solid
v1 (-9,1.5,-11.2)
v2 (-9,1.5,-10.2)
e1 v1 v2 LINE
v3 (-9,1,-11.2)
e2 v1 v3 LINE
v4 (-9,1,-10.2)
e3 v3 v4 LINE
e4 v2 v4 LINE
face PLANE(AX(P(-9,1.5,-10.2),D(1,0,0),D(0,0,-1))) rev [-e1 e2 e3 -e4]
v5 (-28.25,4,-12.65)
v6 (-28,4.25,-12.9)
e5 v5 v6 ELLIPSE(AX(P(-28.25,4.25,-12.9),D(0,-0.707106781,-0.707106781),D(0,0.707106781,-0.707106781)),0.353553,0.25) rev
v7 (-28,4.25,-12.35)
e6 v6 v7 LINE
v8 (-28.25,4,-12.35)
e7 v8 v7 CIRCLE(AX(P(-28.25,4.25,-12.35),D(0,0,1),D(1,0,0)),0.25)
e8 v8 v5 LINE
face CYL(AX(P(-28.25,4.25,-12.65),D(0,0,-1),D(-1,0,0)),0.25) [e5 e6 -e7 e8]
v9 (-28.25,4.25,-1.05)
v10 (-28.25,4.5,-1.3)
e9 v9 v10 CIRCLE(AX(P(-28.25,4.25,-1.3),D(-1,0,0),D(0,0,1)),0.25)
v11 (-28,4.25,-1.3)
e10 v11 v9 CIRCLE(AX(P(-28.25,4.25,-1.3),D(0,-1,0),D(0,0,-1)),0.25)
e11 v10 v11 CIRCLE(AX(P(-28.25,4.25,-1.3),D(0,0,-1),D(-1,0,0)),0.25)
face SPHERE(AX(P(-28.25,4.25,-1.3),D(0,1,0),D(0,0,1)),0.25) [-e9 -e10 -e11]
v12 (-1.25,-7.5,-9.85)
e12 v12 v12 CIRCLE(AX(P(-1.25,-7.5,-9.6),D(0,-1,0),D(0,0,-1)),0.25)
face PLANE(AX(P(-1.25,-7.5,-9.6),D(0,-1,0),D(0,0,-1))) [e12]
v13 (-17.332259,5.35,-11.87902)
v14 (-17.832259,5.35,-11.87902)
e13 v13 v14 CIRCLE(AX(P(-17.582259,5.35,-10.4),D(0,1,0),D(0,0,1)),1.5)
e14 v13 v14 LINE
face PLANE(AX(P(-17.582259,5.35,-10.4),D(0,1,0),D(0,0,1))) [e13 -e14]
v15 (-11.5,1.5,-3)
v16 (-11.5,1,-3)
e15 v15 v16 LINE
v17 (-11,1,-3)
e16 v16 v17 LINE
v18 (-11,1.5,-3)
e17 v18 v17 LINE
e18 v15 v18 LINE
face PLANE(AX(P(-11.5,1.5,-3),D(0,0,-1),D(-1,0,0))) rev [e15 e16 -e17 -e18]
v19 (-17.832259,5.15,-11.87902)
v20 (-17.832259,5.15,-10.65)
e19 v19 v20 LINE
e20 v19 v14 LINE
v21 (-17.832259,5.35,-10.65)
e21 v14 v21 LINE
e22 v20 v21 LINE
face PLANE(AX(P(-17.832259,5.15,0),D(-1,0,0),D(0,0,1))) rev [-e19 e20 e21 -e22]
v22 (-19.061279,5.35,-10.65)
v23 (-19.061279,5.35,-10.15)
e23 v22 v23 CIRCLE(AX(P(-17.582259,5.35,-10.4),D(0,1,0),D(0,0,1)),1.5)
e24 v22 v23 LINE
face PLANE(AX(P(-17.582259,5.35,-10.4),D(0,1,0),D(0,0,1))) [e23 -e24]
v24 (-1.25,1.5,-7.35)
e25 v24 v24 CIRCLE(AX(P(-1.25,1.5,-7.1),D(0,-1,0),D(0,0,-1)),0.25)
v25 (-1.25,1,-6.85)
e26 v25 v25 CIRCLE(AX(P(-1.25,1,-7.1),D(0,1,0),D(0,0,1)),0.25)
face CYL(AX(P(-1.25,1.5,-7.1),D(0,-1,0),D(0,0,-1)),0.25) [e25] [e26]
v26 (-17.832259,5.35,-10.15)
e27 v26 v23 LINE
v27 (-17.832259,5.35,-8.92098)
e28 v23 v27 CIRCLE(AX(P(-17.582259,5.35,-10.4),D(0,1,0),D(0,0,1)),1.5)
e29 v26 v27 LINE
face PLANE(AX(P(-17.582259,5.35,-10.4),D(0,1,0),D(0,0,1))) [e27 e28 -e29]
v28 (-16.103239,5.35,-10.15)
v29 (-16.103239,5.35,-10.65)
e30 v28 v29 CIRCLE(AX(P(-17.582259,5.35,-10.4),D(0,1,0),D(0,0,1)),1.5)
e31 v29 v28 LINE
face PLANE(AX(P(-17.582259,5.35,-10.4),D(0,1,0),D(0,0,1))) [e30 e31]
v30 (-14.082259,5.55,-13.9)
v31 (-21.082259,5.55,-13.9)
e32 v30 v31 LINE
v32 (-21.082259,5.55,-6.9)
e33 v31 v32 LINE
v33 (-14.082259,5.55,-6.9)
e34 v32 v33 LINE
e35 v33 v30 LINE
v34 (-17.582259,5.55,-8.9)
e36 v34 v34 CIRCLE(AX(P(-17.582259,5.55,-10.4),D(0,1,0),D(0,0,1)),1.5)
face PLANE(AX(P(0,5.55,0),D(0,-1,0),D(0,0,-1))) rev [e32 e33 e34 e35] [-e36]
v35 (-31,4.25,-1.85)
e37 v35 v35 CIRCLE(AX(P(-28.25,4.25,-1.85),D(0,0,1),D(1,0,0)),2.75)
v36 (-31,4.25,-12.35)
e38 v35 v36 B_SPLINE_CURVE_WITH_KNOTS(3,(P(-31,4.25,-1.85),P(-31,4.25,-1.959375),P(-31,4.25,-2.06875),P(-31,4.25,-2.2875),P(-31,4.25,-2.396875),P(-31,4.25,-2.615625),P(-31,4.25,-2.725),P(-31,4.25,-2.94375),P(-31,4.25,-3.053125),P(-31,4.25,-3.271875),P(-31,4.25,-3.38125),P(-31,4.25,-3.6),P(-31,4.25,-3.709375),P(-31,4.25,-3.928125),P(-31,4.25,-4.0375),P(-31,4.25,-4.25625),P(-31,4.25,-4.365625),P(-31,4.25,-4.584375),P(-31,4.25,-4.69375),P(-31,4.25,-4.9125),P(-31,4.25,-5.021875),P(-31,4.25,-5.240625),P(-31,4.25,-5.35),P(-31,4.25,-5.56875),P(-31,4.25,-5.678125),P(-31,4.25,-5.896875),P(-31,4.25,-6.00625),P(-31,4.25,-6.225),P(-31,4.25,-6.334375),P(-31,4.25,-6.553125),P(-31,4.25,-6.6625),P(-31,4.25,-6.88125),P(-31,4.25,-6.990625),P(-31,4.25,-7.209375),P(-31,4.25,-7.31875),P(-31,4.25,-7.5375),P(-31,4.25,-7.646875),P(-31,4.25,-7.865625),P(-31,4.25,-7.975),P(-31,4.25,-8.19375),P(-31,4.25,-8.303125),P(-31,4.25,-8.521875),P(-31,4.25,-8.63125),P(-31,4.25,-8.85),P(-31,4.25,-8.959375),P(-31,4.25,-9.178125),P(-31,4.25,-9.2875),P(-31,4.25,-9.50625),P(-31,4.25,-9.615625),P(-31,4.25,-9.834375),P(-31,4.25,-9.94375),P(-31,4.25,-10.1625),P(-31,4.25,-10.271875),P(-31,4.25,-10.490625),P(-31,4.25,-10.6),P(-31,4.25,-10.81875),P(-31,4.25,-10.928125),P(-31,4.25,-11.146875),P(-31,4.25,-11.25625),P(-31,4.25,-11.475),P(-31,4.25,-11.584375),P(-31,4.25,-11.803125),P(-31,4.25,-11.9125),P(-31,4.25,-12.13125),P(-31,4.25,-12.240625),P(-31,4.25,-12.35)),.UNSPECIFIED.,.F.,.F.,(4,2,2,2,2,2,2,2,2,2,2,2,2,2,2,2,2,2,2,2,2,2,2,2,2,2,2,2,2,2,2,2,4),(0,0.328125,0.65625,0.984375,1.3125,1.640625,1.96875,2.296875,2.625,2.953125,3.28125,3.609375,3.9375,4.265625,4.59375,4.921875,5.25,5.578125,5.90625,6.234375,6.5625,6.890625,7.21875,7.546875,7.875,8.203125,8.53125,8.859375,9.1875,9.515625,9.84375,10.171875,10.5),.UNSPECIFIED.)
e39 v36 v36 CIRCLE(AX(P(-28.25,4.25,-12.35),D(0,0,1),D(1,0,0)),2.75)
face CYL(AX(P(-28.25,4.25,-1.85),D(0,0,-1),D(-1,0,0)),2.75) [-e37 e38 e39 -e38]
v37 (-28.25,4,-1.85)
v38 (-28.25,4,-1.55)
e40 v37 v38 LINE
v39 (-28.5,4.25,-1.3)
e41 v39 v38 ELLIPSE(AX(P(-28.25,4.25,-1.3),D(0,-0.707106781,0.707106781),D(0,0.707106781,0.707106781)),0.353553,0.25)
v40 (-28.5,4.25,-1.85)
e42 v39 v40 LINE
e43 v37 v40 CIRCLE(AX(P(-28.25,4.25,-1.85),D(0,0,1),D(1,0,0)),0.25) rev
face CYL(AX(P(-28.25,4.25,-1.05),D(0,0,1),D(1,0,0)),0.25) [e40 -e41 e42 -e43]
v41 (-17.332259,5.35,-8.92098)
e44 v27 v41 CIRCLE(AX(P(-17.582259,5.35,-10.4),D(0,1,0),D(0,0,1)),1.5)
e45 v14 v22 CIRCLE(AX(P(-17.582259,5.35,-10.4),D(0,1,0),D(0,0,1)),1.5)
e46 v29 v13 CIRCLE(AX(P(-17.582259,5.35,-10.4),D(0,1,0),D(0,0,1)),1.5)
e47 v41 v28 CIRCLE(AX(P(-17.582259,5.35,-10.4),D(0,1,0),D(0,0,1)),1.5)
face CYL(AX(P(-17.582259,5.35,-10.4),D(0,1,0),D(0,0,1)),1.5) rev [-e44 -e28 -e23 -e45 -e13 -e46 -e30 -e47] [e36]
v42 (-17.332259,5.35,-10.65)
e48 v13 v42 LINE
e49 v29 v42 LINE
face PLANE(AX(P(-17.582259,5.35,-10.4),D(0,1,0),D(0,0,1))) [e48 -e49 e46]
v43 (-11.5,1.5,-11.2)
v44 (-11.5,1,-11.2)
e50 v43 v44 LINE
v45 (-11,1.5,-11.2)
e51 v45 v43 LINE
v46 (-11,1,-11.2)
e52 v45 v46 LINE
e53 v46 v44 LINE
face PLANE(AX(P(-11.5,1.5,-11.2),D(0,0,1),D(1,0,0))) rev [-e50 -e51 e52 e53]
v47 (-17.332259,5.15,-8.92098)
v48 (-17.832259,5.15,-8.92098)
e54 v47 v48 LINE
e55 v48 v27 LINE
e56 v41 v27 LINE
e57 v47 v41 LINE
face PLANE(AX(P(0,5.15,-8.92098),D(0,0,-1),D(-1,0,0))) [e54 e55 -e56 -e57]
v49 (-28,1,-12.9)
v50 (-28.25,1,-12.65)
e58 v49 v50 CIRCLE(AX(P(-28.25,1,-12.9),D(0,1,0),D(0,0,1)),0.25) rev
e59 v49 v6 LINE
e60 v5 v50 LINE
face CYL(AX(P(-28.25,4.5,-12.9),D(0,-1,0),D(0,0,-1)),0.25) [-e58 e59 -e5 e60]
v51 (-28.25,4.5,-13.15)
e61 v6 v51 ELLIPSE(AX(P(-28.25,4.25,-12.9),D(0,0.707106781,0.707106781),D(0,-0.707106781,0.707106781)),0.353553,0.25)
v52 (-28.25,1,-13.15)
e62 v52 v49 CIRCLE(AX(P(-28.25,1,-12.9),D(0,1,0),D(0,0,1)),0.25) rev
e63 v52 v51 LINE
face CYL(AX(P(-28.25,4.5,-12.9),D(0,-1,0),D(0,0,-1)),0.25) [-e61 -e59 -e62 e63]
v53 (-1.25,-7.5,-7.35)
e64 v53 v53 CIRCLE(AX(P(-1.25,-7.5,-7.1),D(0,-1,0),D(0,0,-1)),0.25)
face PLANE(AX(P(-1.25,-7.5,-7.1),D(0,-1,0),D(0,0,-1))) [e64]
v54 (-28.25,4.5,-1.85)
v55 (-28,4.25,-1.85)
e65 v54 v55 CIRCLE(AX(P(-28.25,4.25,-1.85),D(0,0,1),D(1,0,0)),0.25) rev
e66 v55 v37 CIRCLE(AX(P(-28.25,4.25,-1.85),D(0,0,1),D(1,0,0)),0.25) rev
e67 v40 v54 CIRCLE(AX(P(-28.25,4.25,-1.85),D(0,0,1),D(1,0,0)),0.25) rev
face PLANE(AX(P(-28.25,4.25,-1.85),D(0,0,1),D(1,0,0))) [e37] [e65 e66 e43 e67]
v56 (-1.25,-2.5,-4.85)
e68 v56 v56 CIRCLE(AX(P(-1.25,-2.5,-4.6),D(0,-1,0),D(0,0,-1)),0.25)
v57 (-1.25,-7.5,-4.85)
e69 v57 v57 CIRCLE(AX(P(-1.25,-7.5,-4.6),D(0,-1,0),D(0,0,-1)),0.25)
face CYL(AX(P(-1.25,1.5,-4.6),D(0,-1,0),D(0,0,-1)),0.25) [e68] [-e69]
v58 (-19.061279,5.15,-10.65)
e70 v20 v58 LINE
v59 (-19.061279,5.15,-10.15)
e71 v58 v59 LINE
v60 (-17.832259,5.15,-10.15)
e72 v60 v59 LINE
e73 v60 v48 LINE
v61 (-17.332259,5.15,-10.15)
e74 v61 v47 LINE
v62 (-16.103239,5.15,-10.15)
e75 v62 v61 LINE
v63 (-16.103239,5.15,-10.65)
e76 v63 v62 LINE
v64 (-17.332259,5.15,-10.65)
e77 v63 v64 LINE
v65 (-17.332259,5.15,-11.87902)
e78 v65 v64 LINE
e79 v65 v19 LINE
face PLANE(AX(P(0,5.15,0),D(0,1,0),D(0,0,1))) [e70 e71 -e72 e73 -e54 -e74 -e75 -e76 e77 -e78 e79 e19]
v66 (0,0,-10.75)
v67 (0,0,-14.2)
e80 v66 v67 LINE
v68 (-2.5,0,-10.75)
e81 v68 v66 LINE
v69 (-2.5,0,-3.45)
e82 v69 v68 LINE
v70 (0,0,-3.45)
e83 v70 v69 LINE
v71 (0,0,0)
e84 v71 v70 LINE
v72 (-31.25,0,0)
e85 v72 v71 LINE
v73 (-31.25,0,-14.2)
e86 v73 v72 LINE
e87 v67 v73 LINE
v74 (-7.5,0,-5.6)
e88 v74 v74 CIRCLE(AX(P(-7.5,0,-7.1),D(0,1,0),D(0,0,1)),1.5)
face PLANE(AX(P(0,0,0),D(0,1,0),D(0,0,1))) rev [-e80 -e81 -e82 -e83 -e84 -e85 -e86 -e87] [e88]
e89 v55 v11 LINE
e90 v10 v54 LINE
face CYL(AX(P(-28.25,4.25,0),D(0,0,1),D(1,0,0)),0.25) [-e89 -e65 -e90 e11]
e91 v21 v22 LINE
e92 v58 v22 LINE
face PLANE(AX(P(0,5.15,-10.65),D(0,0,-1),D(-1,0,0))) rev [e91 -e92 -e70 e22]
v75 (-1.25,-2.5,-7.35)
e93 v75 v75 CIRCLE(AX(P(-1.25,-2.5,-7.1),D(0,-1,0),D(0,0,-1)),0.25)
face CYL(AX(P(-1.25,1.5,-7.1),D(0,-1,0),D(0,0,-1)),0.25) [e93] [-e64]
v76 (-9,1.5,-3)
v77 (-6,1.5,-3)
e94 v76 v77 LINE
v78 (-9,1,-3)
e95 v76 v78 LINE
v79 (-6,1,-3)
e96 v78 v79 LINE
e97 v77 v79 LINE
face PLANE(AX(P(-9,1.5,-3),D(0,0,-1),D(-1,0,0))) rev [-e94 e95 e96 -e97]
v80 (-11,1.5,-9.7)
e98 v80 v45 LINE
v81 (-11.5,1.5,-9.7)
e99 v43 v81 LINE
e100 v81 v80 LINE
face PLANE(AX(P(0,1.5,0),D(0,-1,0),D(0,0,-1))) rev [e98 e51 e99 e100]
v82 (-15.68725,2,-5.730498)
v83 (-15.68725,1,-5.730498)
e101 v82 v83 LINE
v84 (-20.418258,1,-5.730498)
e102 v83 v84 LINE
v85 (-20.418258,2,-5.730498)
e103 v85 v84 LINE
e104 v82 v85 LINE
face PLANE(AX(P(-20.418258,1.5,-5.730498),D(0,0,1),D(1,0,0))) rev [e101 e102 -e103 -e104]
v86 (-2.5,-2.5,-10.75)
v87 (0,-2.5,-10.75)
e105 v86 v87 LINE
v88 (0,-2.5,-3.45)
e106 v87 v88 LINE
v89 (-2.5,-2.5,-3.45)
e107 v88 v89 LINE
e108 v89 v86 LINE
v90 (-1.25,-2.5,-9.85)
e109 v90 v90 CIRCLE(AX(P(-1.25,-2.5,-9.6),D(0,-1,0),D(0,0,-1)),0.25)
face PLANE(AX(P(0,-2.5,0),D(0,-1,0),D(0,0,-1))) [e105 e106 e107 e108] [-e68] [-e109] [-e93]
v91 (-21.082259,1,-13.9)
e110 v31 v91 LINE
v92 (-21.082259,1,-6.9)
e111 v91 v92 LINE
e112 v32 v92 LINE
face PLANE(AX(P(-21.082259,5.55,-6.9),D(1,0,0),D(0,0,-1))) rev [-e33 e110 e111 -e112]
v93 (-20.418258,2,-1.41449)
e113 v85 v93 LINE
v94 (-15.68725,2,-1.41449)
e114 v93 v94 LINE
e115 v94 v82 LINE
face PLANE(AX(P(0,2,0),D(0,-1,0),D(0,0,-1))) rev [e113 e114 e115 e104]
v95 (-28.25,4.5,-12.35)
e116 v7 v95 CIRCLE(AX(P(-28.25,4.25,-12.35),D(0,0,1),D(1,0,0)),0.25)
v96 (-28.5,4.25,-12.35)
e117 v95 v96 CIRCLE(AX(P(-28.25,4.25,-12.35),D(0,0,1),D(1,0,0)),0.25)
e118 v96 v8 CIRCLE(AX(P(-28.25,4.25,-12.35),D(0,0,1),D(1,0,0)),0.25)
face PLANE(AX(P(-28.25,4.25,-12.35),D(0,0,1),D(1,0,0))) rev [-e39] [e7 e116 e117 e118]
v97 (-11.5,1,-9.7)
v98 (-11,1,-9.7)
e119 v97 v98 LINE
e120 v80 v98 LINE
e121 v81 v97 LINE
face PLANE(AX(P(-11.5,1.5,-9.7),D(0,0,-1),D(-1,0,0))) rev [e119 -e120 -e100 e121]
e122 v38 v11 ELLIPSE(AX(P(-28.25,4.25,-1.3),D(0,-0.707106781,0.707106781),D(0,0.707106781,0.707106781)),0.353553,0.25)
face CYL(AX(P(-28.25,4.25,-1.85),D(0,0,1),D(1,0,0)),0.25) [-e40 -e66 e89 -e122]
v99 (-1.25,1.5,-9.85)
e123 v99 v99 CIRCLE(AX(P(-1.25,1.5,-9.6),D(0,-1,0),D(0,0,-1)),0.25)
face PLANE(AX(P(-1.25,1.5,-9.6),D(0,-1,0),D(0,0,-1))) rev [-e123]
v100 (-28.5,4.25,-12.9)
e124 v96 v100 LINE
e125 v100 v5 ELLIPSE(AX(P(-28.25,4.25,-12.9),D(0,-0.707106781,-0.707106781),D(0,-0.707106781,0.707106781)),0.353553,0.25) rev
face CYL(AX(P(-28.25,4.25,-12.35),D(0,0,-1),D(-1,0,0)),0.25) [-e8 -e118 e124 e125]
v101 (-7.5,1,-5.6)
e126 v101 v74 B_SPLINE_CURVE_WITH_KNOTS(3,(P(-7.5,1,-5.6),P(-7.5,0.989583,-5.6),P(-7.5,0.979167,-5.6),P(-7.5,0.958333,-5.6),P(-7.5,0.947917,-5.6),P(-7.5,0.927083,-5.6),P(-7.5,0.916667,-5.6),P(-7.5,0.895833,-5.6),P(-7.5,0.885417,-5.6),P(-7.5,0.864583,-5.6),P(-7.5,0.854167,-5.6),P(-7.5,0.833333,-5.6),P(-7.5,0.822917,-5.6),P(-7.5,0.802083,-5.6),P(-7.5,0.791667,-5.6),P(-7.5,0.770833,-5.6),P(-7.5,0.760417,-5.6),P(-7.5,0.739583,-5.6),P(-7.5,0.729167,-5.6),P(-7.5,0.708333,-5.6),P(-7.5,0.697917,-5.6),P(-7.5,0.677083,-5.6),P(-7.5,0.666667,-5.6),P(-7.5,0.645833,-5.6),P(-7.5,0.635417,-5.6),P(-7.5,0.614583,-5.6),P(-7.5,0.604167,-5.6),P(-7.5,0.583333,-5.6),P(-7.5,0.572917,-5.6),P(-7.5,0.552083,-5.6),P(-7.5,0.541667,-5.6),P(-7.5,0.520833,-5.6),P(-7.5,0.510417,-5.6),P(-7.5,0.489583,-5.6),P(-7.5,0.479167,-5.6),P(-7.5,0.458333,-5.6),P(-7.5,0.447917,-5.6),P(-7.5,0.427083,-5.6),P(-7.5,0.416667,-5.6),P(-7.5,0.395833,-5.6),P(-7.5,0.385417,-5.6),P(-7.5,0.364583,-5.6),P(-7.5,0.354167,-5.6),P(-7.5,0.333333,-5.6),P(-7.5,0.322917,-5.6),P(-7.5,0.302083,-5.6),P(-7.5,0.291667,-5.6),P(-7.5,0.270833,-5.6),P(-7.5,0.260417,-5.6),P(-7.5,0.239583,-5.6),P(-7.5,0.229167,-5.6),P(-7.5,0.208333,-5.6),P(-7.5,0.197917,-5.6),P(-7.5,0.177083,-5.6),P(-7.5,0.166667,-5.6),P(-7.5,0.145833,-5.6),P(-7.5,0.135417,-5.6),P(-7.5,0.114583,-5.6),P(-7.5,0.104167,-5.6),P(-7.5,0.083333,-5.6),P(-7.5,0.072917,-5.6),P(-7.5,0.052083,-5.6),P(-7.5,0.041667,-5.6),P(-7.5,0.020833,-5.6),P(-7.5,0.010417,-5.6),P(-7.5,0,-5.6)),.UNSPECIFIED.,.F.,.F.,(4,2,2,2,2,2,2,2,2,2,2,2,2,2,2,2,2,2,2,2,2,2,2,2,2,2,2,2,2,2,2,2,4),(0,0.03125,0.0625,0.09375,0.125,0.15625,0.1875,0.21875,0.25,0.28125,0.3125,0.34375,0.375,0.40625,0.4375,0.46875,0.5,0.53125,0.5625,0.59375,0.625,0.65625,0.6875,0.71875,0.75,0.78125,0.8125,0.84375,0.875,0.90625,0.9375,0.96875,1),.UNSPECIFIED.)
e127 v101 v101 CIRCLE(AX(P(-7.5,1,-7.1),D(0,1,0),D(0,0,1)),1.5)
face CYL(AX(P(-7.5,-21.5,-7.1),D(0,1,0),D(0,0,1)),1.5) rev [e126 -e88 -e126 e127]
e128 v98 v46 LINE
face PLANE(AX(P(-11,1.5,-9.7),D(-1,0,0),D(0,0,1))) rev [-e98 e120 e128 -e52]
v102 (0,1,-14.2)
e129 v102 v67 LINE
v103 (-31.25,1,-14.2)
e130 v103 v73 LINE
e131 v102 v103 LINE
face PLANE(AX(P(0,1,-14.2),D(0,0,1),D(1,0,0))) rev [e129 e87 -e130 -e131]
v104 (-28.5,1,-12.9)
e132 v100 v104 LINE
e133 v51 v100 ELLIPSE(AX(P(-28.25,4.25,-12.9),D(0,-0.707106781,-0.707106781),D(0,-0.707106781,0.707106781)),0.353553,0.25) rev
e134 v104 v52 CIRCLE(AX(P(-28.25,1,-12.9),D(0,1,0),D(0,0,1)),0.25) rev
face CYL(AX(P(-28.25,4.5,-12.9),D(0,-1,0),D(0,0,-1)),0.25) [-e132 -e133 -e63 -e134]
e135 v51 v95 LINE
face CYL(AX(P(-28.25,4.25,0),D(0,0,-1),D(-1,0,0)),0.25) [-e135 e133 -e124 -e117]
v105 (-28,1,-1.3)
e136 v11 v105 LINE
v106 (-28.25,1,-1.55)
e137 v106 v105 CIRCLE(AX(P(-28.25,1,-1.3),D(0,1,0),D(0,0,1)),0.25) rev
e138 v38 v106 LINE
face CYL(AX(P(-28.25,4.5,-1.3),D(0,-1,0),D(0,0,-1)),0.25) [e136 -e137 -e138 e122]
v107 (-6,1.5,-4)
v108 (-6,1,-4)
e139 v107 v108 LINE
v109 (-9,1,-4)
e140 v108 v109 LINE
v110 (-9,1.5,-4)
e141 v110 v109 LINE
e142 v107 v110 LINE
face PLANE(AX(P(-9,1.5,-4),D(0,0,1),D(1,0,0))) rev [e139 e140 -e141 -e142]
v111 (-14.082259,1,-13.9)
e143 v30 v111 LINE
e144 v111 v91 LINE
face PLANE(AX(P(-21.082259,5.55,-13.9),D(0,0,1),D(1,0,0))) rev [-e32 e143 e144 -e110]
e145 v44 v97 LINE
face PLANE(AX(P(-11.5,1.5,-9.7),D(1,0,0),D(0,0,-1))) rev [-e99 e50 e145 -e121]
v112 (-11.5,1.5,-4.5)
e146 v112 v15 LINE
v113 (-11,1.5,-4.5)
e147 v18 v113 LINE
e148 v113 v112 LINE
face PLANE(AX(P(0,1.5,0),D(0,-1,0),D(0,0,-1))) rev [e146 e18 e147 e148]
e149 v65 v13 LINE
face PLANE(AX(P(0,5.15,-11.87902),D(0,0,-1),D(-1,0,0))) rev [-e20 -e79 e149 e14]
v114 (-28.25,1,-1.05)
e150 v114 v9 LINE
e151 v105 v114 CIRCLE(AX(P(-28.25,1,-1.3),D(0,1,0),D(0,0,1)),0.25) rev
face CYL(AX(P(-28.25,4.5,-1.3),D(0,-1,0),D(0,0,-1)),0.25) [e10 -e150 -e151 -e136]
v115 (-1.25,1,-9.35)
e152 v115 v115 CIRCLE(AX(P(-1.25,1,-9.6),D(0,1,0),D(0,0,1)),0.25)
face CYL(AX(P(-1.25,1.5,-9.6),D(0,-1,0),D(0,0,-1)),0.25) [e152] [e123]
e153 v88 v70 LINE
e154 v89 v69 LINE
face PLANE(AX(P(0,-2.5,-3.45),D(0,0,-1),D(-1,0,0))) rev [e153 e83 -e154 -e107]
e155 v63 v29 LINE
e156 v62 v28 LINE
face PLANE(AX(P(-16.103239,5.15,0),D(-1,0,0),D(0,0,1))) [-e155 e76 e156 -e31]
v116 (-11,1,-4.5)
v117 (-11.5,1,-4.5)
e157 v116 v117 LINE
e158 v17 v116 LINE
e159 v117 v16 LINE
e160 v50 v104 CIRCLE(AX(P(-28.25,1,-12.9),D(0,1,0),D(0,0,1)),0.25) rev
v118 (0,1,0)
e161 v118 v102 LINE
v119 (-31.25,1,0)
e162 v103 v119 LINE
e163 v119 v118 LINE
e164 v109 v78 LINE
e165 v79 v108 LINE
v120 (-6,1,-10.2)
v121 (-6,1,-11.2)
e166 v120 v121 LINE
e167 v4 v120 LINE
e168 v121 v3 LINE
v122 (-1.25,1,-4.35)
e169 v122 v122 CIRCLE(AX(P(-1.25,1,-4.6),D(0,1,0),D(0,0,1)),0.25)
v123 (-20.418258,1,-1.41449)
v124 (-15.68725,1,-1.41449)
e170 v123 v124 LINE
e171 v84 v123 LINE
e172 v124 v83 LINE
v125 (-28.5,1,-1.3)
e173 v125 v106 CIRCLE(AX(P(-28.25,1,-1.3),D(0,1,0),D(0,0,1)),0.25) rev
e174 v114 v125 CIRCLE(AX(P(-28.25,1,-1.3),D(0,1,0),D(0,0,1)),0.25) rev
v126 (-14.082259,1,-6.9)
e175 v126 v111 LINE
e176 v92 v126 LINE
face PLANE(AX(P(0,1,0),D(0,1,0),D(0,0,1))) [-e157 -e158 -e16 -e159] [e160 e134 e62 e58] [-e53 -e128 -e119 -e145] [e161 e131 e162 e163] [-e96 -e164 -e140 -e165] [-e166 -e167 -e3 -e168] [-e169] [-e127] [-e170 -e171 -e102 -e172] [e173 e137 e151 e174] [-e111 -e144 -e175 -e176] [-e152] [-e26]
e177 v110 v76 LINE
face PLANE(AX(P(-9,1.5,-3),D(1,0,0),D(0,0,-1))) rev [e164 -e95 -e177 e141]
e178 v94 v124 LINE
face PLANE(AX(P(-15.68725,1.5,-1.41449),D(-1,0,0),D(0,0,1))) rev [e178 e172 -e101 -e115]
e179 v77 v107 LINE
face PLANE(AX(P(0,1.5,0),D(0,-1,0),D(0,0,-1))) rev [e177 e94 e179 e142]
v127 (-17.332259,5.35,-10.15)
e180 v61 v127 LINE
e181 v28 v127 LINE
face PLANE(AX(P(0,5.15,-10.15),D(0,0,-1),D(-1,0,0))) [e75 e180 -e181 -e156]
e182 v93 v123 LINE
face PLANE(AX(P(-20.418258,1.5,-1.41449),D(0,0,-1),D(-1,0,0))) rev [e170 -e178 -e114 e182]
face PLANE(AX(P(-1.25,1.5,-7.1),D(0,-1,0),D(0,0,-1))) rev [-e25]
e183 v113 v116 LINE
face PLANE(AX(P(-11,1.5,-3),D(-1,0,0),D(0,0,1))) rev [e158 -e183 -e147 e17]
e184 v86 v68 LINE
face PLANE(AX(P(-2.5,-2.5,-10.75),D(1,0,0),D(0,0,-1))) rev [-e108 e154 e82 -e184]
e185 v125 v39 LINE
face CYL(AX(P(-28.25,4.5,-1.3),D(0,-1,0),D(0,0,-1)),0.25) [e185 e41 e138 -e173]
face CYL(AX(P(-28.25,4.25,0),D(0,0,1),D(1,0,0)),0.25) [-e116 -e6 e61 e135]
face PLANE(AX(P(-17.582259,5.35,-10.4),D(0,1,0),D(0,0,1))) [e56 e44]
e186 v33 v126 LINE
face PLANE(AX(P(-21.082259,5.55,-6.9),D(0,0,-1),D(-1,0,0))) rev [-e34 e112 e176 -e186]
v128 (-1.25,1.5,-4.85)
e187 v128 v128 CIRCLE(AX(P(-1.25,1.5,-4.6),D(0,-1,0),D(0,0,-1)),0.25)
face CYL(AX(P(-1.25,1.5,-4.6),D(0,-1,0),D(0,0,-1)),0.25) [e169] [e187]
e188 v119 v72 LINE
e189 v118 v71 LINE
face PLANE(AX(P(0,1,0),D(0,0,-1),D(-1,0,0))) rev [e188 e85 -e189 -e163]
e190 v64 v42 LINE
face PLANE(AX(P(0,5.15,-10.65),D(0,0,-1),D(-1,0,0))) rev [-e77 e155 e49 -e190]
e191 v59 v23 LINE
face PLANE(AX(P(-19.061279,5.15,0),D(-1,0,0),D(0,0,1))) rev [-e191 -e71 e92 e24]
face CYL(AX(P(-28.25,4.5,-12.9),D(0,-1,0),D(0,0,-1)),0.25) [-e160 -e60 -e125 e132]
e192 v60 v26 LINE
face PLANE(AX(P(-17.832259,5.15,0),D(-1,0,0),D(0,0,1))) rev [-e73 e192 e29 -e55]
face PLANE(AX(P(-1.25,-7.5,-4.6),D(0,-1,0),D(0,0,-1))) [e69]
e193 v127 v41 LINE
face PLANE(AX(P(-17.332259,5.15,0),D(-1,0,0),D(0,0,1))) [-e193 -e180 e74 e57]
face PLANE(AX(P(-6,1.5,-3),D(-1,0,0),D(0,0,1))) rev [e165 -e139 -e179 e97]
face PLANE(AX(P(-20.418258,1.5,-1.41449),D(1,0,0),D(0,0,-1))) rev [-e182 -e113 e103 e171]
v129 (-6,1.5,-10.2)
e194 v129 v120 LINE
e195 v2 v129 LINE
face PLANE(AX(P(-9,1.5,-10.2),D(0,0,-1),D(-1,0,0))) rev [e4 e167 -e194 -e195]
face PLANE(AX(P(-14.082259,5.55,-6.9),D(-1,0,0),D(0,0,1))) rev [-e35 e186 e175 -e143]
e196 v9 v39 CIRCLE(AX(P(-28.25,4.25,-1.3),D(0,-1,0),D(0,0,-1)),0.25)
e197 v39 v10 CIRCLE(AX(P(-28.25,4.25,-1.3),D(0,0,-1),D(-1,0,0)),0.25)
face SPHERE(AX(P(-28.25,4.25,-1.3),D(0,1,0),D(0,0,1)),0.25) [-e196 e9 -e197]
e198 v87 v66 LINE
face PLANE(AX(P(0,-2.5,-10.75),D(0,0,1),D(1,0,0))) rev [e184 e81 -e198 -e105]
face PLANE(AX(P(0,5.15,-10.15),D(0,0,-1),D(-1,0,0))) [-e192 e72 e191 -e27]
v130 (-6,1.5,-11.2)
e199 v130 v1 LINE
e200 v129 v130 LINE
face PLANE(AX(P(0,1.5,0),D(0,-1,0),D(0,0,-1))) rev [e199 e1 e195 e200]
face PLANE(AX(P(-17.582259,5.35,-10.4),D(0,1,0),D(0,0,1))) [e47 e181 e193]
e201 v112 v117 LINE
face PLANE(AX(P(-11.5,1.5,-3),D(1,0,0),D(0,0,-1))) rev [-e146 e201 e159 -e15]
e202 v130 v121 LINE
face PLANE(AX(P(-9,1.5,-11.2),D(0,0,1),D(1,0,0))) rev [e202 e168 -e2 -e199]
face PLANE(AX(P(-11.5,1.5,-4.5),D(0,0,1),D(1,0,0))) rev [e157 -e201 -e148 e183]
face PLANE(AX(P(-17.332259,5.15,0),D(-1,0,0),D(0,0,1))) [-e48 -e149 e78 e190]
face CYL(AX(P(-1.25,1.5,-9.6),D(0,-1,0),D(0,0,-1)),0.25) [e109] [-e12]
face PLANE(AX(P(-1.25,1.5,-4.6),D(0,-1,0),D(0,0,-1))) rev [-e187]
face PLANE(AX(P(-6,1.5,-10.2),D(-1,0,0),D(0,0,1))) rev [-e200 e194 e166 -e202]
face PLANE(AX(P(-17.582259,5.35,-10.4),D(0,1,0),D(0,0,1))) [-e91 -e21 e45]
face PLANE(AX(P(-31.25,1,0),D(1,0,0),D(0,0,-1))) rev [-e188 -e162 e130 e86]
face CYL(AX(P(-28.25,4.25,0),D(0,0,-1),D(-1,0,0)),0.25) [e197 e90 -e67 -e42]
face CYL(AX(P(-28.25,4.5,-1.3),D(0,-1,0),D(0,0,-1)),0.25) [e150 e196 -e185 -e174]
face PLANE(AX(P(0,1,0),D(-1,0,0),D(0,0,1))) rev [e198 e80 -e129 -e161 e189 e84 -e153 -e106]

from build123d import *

# Parameters (mm, degrees)
ESQUISSE1_W              = 31.25
ESQUISSE1_H              = 14.2
BOSS_EXTRU_1_DEPTH       = 1
ESQUISSE2_W              = 0.5
ESQUISSE2_H              = 0.5
BOSS_EXTRU_2_DEPTH       = 3.5
ESQUISSE3_W              = 0.5
ESQUISSE3_H              = 0.5
BOSS_EXTRU_3_DEPTH       = 0.3
ESQUISSE4_W              = 0.5
ESQUISSE4_H              = 0.5
BOSS_EXTRU_4_DEPTH       = 0.3
ESQUISSE5_R              = 2.75
BOSS_EXTRU_5_DEPTH       = 10.5
ESQUISSE6_W              = 7
ESQUISSE6_H              = 7
BOSS_EXTRU_6_DEPTH       = 4.55
ESQUISSE7_R              = 1.5
ENL_V_MAT_EXTRU_1_DEPTH  = 0.2
ESQUISSE8_W              = 1.229019946
ESQUISSE8_H              = 0.5
ESQUISSE8_W_2            = 0.5
ESQUISSE8_H_2            = 1.229019946
ENL_V_MAT_EXTRU_2_DEPTH  = 0.2
ESQUISSE9_W              = 4.73100796
ESQUISSE9_H              = 4.316007262
ESQUISSE9_W_2            = 3
ESQUISSE9_H_2            = 1
ESQUISSE9_W_3            = 0.5
ESQUISSE9_H_3            = 1.5
BOSS_EXTRU_7_DEPTH       = 0.5
ESQUISSE10_W             = 4.73100796
ESQUISSE10_H             = 4.316007262
BOSS_EXTRU_8_DEPTH       = 0.5
ESQUISSE11_R             = 1.5
ENL_V_MAT_EXTRU_3_DEPTH  = 22.5
ESQUISSE12_W             = 2.5
ESQUISSE12_H             = 7.3
BOSS_EXTRU_9_DEPTH       = 2.5
BOSS_EXTRU_10_DEPTH      = 5
BOSS_EXTRU_10_DEPTH_BACK = 4
ESQUISSE13_R             = 0.25
CONG_1_R                 = 0.25
CONG_2_R                 = 0.25
CONG_3_R                 = 0.25


with BuildPart() as part:
    # Esquisse1 → Boss.-Extru.1 (new body)
    with BuildSketch(Plane(origin=(0, 0, 0), x_dir=(1, 0, 0), z_dir=(0, 1, 0))):
        with Locations((-15.625, 7.1)):
            Rectangle(ESQUISSE1_W, ESQUISSE1_H)
    extrude(amount=BOSS_EXTRU_1_DEPTH)

    # Esquisse2 → Boss.-Extru.2 (add)
    with BuildSketch(Plane(origin=(0, 1, 0), x_dir=(1, 0, 0), z_dir=(0, 1, 0))):
        with Locations((-28.25, 12.9)):
            Rectangle(ESQUISSE2_W, ESQUISSE2_H)
        with Locations((-28.25, 1.3)):
            Rectangle(ESQUISSE2_W, ESQUISSE2_H)
    extrude(amount=BOSS_EXTRU_2_DEPTH)

    # Esquisse3 → Boss.-Extru.3 (add)
    with BuildSketch(Plane.XY.offset(-12.65)):
        with Locations((-28.25, 4.25)):
            Rectangle(ESQUISSE3_W, ESQUISSE3_H)
    extrude(amount=BOSS_EXTRU_3_DEPTH)

    # Esquisse4 → Boss.-Extru.4 (add)
    with BuildSketch(Plane(origin=(0, 0, -1.55), x_dir=(-1, 0, 0), z_dir=(0, 0, -1))):
        with Locations((28.25, 4.25)):
            Rectangle(ESQUISSE4_W, ESQUISSE4_H)
    extrude(amount=BOSS_EXTRU_4_DEPTH)

    # Esquisse5 → Boss.-Extru.5 (add)
    with BuildSketch(Plane.XY.offset(-12.35)):
        with Locations(Location((-28.25, 4.25, 0), (0, 0, 180))):
            Circle(ESQUISSE5_R)
    extrude(amount=BOSS_EXTRU_5_DEPTH)

    # Esquisse6 → Boss.-Extru.6 (add)
    with BuildSketch(Plane(origin=(0, 1, 0), x_dir=(1, 0, 0), z_dir=(0, 1, 0))):
        with Locations((-17.582259182, 10.4)):
            Rectangle(ESQUISSE6_W, ESQUISSE6_H)
    extrude(amount=BOSS_EXTRU_6_DEPTH)

    # Esquisse7 → Enlèv. mat.-Extru.1 (cut)
    with BuildSketch(Plane(origin=(0, 5.55, 0), x_dir=(1, 0, 0), z_dir=(0, 1, 0))):
        with Locations(Location((-17.582259182, 10.4, 0), (0, 0, 270))):
            Circle(ESQUISSE7_R)
    extrude(amount=-ENL_V_MAT_EXTRU_1_DEPTH, mode=Mode.SUBTRACT)

    # Esquisse8 → Enlèv. mat.-Extru.2 (cut)
    with BuildSketch(Plane(origin=(0, 5.35, 0), x_dir=(1, 0, 0), z_dir=(0, 1, 0))):
        with Locations((-18.446769155, 10.4)):
            Rectangle(ESQUISSE8_W, ESQUISSE8_H)
        with Locations((-17.582259182, 9.535490027)):
            Rectangle(ESQUISSE8_W_2, ESQUISSE8_H_2)
        with Locations((-16.717749209, 10.4)):
            Rectangle(ESQUISSE8_W, ESQUISSE8_H)
        with Locations((-17.582259182, 11.264509973)):
            Rectangle(ESQUISSE8_W_2, ESQUISSE8_H_2)
        with Locations((-17.582259182, 10.4)):
            Rectangle(ESQUISSE8_W_2, ESQUISSE8_H)
    extrude(amount=-ENL_V_MAT_EXTRU_2_DEPTH, mode=Mode.SUBTRACT)

    # Esquisse9 → Boss.-Extru.7 (add)
    with BuildSketch(Plane(origin=(0, 1, 0), x_dir=(1, 0, 0), z_dir=(0, 1, 0))):
        with Locations((-18.052754085, 3.572494065)):
            Rectangle(ESQUISSE9_W, ESQUISSE9_H)
        with Locations((-7.5, 3.5)):
            Rectangle(ESQUISSE9_W_2, ESQUISSE9_H_2)
        with Locations((-7.5, 10.7)):
            Rectangle(ESQUISSE9_W_2, ESQUISSE9_H_2)
        with Locations((-11.25, 3.75)):
            Rectangle(ESQUISSE9_W_3, ESQUISSE9_H_3)
        with Locations((-11.25, 10.45)):
            Rectangle(ESQUISSE9_W_3, ESQUISSE9_H_3)
    extrude(amount=BOSS_EXTRU_7_DEPTH)

    # Esquisse10 → Boss.-Extru.8 (add)
    with BuildSketch(Plane(origin=(0, 1.5, 0), x_dir=(1, 0, 0), z_dir=(0, 1, 0))):
        with Locations((-18.052754085, 3.572494065)):
            Rectangle(ESQUISSE10_W, ESQUISSE10_H)
    extrude(amount=BOSS_EXTRU_8_DEPTH)

    # Esquisse11 → Enlèv. mat.-Extru.3 (cut)
    with BuildSketch(Plane(origin=(0, 1, 0), x_dir=(1, 0, 0), z_dir=(0, 1, 0))):
        with Locations(Location((-7.5, 7.1, 0), (0, 0, 270))):
            Circle(ESQUISSE11_R)
    extrude(amount=-ENL_V_MAT_EXTRU_3_DEPTH, mode=Mode.SUBTRACT)

    # Esquisse12 → Boss.-Extru.9 (add)
    with BuildSketch(Plane(origin=(0, 0, 0), x_dir=(-1, 0, 0), z_dir=(0, -1, 0))):
        with Locations((1.25, 7.1)):
            Rectangle(ESQUISSE12_W, ESQUISSE12_H)
    extrude(amount=BOSS_EXTRU_9_DEPTH)

    # Esquisse13 → Boss.-Extru.10 (add, two sides: drawn at the far end of the back side and taken through both)
    with BuildSketch(Plane(origin=(0, -2.5, 0), x_dir=(-1, 0, 0), z_dir=(0, -1, 0)).offset(-BOSS_EXTRU_10_DEPTH_BACK)):
        with Locations(Location((1.25, 9.6, 0), (0, 0, 90))):
            Circle(ESQUISSE13_R)
        with Locations(Location((1.25, 7.1, 0), (0, 0, 90))):
            Circle(ESQUISSE13_R)
        with Locations(Location((1.25, 4.6, 0), (0, 0, 90))):
            Circle(ESQUISSE13_R)
    extrude(amount=BOSS_EXTRU_10_DEPTH + BOSS_EXTRU_10_DEPTH_BACK)

    # Congé1
    cong_1_edges = [part.edges().sort_by_distance(p)[0] for p in [
        (-28.5, 2.5, -1.55),
        (-28, 2.75, -1.05),
        (-28, 2.5, -1.55),
        (-28.5, 2.75, -1.05),
    ]]
    fillet(cong_1_edges, radius=CONG_1_R - 0.0001)  # a hair under: the kernel refuses the full size

    # Congé2
    cong_2_edges = [part.edges().sort_by_distance(p)[0] for p in [
        (-28.5, 4, -1.57505),
        (-28, 4, -1.57505),
        (-28.426805985, 4.5, -1.123194015),
        (-28.073194015, 4.5, -1.123194015),
        (-28.5, 4.5, -1.57495),
        (-28, 4.5, -1.57495),
    ]]
    fillet(cong_2_edges, radius=CONG_2_R - 0.0001)  # a hair under: the kernel refuses the full size

    # Congé3
    cong_3_edges = [part.edges().sort_by_distance(p)[0] for p in [
        (-28, 4, -12.5),
        (-28, 2.5, -12.65),
        (-28, 2.75, -13.15),
        (-28, 4.5, -12.75),
        (-28.5, 2.5, -12.65),
        (-28.5, 4, -12.5),
        (-28.5, 4.5, -12.75),
        (-28.5, 2.75, -13.15),
    ]]
    fillet(cong_3_edges, radius=CONG_3_R - 0.0001)  # a hair under: the kernel refuses the full size


solid = part.part
